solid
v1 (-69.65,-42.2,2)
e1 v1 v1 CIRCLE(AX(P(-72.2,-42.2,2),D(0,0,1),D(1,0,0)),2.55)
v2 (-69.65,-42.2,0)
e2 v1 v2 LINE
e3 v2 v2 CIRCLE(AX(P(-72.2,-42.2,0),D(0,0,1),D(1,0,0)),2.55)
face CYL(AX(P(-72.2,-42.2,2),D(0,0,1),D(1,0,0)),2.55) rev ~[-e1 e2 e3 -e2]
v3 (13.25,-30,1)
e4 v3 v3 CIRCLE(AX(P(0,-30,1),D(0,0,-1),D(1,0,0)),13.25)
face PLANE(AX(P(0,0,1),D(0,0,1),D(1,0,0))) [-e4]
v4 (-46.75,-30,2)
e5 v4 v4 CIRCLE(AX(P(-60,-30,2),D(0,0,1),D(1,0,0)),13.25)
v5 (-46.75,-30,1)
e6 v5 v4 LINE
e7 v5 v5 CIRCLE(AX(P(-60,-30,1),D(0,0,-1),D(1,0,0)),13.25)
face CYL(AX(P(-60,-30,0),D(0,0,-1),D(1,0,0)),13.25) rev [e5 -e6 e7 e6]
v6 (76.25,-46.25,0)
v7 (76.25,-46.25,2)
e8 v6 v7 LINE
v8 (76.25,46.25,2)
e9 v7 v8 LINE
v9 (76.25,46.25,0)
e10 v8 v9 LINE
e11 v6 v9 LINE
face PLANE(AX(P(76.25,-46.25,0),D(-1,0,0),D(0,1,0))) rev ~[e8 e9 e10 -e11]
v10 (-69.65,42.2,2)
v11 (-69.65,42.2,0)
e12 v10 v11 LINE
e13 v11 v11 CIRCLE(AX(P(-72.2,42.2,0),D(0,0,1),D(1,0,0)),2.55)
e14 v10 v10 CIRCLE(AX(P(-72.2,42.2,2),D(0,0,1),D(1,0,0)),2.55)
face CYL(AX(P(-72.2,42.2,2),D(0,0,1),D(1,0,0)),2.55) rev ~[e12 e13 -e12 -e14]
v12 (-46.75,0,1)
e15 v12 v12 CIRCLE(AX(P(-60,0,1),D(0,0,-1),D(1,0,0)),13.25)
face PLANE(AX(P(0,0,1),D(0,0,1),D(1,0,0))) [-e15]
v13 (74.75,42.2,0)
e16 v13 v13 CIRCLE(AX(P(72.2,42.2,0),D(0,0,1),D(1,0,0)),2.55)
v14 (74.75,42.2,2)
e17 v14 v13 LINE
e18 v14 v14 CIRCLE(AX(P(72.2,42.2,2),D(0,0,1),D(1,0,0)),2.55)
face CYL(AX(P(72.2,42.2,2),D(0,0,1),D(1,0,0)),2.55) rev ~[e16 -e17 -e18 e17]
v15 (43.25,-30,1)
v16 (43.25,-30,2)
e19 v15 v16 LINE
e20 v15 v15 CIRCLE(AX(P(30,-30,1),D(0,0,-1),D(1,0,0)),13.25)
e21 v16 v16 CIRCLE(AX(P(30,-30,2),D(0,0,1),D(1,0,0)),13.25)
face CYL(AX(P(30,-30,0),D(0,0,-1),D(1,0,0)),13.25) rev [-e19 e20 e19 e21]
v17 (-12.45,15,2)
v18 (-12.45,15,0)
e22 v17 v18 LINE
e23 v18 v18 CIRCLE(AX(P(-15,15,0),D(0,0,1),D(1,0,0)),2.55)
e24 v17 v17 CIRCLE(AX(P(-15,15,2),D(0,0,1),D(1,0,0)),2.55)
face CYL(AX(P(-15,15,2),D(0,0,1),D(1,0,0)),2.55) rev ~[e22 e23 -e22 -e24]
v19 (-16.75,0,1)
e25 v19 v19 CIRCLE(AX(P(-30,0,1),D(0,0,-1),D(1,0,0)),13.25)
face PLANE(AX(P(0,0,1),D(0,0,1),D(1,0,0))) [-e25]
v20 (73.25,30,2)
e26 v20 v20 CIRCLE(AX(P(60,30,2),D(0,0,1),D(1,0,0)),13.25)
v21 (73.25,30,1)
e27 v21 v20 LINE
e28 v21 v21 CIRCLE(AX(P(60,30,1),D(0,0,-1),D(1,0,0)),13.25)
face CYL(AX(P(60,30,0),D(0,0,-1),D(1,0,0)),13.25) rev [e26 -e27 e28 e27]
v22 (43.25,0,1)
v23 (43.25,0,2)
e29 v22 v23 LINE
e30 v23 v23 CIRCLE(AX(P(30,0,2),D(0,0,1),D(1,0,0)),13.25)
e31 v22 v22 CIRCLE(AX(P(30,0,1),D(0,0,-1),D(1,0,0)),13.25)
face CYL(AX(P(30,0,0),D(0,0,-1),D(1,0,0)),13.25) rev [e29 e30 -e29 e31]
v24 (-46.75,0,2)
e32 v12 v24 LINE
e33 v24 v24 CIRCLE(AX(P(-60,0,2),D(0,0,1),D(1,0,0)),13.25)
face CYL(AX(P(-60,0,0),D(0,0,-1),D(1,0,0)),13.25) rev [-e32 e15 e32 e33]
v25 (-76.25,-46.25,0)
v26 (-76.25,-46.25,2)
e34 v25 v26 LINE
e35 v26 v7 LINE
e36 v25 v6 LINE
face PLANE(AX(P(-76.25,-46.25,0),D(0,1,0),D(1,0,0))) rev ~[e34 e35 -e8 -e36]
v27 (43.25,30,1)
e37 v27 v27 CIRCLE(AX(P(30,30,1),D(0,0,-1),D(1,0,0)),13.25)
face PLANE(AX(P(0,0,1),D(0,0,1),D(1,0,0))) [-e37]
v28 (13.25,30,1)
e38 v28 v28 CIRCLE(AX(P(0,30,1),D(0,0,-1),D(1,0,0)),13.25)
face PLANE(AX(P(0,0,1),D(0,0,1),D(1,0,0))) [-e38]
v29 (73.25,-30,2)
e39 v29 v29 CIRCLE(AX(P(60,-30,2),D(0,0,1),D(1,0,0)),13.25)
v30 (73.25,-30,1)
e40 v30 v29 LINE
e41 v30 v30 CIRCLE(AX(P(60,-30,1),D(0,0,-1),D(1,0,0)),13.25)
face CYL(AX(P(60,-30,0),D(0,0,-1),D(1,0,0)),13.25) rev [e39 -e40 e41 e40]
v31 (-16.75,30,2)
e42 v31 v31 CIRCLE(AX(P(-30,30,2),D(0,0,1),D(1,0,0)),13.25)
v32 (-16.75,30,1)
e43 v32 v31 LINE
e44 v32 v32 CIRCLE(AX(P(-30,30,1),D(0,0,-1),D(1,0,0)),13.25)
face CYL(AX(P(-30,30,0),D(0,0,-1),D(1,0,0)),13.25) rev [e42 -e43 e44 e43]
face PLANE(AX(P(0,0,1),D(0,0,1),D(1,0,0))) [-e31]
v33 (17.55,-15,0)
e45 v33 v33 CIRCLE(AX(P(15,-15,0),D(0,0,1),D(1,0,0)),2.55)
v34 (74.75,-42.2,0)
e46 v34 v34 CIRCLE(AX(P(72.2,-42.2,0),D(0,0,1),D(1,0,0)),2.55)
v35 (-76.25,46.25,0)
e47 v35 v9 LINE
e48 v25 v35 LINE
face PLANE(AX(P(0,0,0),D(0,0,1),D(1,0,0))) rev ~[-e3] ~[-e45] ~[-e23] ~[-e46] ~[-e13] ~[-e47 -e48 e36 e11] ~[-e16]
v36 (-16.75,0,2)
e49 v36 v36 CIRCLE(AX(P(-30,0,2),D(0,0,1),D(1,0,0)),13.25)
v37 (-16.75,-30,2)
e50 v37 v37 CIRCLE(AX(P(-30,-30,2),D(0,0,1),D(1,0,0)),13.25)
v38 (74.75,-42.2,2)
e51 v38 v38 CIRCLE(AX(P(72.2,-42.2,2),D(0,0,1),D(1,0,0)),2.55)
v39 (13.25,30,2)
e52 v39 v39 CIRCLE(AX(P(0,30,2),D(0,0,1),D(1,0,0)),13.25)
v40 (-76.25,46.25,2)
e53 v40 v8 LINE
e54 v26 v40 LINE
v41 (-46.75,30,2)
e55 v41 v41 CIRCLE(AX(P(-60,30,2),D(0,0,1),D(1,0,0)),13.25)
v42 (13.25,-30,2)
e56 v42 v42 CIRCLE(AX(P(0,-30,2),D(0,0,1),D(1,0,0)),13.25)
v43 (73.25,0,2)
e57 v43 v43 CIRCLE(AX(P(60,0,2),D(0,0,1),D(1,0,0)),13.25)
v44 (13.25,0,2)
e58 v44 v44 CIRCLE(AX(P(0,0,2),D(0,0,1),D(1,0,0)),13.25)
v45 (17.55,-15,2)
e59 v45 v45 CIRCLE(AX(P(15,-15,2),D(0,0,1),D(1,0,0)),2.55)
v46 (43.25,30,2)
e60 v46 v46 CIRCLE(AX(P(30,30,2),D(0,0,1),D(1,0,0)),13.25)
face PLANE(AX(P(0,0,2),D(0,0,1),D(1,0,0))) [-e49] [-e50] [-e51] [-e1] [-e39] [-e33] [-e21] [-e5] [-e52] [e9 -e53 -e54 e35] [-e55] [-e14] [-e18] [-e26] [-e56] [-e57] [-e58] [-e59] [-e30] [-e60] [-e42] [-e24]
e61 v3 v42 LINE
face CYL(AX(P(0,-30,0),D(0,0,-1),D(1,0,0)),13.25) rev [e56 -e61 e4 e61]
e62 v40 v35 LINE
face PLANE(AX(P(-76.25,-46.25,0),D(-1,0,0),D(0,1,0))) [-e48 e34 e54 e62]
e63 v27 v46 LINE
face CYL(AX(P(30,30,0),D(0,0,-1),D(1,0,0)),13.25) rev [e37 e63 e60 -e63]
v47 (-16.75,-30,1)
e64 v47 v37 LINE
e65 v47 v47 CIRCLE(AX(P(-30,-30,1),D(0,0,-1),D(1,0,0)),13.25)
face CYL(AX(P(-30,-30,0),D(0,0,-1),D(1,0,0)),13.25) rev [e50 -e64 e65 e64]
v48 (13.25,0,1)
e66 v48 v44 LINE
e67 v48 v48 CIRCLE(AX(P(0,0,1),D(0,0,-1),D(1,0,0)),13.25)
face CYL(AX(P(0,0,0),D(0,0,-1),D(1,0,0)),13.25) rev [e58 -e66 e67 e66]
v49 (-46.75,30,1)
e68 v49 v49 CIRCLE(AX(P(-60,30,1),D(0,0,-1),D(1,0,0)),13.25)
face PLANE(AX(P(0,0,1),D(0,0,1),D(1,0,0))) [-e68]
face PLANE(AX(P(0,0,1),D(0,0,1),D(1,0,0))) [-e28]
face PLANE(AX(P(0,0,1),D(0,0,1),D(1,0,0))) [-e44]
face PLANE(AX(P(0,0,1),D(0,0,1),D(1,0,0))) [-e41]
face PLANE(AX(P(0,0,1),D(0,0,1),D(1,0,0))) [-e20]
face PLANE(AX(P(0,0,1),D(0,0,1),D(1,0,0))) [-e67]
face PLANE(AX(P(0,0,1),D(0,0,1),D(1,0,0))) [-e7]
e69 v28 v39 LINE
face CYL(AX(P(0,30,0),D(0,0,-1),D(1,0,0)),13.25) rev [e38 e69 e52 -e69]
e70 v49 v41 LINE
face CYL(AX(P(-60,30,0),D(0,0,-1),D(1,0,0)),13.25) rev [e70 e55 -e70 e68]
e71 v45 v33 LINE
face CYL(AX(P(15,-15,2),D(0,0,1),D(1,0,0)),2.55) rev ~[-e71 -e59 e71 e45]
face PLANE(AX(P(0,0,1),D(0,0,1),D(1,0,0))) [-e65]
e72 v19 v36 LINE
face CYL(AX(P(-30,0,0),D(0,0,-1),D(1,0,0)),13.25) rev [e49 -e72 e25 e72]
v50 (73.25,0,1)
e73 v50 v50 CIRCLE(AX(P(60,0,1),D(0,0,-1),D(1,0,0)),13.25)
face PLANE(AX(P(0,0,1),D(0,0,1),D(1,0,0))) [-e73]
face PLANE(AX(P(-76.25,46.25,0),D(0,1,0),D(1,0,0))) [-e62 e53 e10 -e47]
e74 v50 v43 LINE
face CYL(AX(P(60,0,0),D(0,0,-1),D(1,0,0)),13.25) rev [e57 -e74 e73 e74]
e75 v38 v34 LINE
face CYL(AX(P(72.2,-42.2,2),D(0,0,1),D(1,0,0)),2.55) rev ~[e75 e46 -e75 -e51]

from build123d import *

# Parameters (mm, degrees)
F0_W     = 152.5
F0_H     = 92.5
F0_R     = 13.25
F1_DEPTH = 1
F2_DEPTH = 2
F3_R     = 2.55
F4_DEPTH = 2.001


# Not quite as in the source:
# - a feature names something its author has since deleted; it is built from what else it names


with BuildPart() as f1:
    # F0 (on Top) → F1 (new body)
    with BuildSketch(Plane.XY):
        Rectangle(F0_W, F0_H)
        with Locations((-60, -30)):
            Circle(F0_R, mode=Mode.SUBTRACT)
        with Locations((-30, -30)):
            Circle(F0_R, mode=Mode.SUBTRACT)
        with Locations((0, -30)):
            Circle(F0_R, mode=Mode.SUBTRACT)
        with Locations((30, -30)):
            Circle(F0_R, mode=Mode.SUBTRACT)
        with Locations((60, -30)):
            Circle(F0_R, mode=Mode.SUBTRACT)
        with Locations((-60, 0)):
            Circle(F0_R, mode=Mode.SUBTRACT)
        with Locations((-30, 0)):
            Circle(F0_R, mode=Mode.SUBTRACT)
        with Locations((-60, 30)):
            Circle(F0_R, mode=Mode.SUBTRACT)
        with Locations((-30, 30)):
            Circle(F0_R, mode=Mode.SUBTRACT)
        Circle(F0_R, mode=Mode.SUBTRACT)
        with Locations((30, 0)):
            Circle(F0_R, mode=Mode.SUBTRACT)
        with Locations((60, 0)):
            Circle(F0_R, mode=Mode.SUBTRACT)
        with Locations((0, 30)):
            Circle(F0_R, mode=Mode.SUBTRACT)
        with Locations((30, 30)):
            Circle(F0_R, mode=Mode.SUBTRACT)
        with Locations((60, 30)):
            Circle(F0_R, mode=Mode.SUBTRACT)
        with Locations((-60, 30)):
            Circle(F0_R)
        with Locations((-30, 30)):
            Circle(F0_R)
        with Locations((0, 30)):
            Circle(F0_R)
        with Locations((30, 30)):
            Circle(F0_R)
        with Locations((60, 30)):
            Circle(F0_R)
        with Locations((60, 0)):
            Circle(F0_R)
        with Locations((30, 0)):
            Circle(F0_R)
        with Locations((-30, 0)):
            Circle(F0_R)
        with Locations((-60, 0)):
            Circle(F0_R)
        Circle(F0_R)
        with Locations((0, -30)):
            Circle(F0_R)
        with Locations((-30, -30)):
            Circle(F0_R)
        with Locations((-60, -30)):
            Circle(F0_R)
        with Locations((30, -30)):
            Circle(F0_R)
        with Locations((60, -30)):
            Circle(F0_R)
    extrude(amount=F1_DEPTH)

    # F0 (on Top) → F2 (join)
    with BuildSketch(Plane.XY):
        Rectangle(F0_W, F0_H)
        with Locations((-60, -30)):
            Circle(F0_R, mode=Mode.SUBTRACT)
        with Locations((-30, -30)):
            Circle(F0_R, mode=Mode.SUBTRACT)
        with Locations((0, -30)):
            Circle(F0_R, mode=Mode.SUBTRACT)
        with Locations((30, -30)):
            Circle(F0_R, mode=Mode.SUBTRACT)
        with Locations((60, -30)):
            Circle(F0_R, mode=Mode.SUBTRACT)
        with Locations((-60, 0)):
            Circle(F0_R, mode=Mode.SUBTRACT)
        with Locations((-30, 0)):
            Circle(F0_R, mode=Mode.SUBTRACT)
        with Locations((-60, 30)):
            Circle(F0_R, mode=Mode.SUBTRACT)
        with Locations((-30, 30)):
            Circle(F0_R, mode=Mode.SUBTRACT)
        Circle(F0_R, mode=Mode.SUBTRACT)
        with Locations((30, 0)):
            Circle(F0_R, mode=Mode.SUBTRACT)
        with Locations((60, 0)):
            Circle(F0_R, mode=Mode.SUBTRACT)
        with Locations((0, 30)):
            Circle(F0_R, mode=Mode.SUBTRACT)
        with Locations((30, 30)):
            Circle(F0_R, mode=Mode.SUBTRACT)
        with Locations((60, 30)):
            Circle(F0_R, mode=Mode.SUBTRACT)
    extrude(amount=F2_DEPTH)

    # F3 (on face) → F4 (cut, through all)
    with BuildSketch(Plane.XY.offset(2)):
        with Locations((-72.2, 42.2)):
            Circle(F3_R)
        with Locations((72.2, 42.2)):
            Circle(F3_R)
        with Locations((-72.2, -42.2)):
            Circle(F3_R)
        with Locations((72.2, -42.2)):
            Circle(F3_R)
        with Locations((15, -15)):
            Circle(F3_R)
        with Locations((-15, 15)):
            Circle(F3_R)
    extrude(amount=-F4_DEPTH, mode=Mode.SUBTRACT)


solid = f1.part
